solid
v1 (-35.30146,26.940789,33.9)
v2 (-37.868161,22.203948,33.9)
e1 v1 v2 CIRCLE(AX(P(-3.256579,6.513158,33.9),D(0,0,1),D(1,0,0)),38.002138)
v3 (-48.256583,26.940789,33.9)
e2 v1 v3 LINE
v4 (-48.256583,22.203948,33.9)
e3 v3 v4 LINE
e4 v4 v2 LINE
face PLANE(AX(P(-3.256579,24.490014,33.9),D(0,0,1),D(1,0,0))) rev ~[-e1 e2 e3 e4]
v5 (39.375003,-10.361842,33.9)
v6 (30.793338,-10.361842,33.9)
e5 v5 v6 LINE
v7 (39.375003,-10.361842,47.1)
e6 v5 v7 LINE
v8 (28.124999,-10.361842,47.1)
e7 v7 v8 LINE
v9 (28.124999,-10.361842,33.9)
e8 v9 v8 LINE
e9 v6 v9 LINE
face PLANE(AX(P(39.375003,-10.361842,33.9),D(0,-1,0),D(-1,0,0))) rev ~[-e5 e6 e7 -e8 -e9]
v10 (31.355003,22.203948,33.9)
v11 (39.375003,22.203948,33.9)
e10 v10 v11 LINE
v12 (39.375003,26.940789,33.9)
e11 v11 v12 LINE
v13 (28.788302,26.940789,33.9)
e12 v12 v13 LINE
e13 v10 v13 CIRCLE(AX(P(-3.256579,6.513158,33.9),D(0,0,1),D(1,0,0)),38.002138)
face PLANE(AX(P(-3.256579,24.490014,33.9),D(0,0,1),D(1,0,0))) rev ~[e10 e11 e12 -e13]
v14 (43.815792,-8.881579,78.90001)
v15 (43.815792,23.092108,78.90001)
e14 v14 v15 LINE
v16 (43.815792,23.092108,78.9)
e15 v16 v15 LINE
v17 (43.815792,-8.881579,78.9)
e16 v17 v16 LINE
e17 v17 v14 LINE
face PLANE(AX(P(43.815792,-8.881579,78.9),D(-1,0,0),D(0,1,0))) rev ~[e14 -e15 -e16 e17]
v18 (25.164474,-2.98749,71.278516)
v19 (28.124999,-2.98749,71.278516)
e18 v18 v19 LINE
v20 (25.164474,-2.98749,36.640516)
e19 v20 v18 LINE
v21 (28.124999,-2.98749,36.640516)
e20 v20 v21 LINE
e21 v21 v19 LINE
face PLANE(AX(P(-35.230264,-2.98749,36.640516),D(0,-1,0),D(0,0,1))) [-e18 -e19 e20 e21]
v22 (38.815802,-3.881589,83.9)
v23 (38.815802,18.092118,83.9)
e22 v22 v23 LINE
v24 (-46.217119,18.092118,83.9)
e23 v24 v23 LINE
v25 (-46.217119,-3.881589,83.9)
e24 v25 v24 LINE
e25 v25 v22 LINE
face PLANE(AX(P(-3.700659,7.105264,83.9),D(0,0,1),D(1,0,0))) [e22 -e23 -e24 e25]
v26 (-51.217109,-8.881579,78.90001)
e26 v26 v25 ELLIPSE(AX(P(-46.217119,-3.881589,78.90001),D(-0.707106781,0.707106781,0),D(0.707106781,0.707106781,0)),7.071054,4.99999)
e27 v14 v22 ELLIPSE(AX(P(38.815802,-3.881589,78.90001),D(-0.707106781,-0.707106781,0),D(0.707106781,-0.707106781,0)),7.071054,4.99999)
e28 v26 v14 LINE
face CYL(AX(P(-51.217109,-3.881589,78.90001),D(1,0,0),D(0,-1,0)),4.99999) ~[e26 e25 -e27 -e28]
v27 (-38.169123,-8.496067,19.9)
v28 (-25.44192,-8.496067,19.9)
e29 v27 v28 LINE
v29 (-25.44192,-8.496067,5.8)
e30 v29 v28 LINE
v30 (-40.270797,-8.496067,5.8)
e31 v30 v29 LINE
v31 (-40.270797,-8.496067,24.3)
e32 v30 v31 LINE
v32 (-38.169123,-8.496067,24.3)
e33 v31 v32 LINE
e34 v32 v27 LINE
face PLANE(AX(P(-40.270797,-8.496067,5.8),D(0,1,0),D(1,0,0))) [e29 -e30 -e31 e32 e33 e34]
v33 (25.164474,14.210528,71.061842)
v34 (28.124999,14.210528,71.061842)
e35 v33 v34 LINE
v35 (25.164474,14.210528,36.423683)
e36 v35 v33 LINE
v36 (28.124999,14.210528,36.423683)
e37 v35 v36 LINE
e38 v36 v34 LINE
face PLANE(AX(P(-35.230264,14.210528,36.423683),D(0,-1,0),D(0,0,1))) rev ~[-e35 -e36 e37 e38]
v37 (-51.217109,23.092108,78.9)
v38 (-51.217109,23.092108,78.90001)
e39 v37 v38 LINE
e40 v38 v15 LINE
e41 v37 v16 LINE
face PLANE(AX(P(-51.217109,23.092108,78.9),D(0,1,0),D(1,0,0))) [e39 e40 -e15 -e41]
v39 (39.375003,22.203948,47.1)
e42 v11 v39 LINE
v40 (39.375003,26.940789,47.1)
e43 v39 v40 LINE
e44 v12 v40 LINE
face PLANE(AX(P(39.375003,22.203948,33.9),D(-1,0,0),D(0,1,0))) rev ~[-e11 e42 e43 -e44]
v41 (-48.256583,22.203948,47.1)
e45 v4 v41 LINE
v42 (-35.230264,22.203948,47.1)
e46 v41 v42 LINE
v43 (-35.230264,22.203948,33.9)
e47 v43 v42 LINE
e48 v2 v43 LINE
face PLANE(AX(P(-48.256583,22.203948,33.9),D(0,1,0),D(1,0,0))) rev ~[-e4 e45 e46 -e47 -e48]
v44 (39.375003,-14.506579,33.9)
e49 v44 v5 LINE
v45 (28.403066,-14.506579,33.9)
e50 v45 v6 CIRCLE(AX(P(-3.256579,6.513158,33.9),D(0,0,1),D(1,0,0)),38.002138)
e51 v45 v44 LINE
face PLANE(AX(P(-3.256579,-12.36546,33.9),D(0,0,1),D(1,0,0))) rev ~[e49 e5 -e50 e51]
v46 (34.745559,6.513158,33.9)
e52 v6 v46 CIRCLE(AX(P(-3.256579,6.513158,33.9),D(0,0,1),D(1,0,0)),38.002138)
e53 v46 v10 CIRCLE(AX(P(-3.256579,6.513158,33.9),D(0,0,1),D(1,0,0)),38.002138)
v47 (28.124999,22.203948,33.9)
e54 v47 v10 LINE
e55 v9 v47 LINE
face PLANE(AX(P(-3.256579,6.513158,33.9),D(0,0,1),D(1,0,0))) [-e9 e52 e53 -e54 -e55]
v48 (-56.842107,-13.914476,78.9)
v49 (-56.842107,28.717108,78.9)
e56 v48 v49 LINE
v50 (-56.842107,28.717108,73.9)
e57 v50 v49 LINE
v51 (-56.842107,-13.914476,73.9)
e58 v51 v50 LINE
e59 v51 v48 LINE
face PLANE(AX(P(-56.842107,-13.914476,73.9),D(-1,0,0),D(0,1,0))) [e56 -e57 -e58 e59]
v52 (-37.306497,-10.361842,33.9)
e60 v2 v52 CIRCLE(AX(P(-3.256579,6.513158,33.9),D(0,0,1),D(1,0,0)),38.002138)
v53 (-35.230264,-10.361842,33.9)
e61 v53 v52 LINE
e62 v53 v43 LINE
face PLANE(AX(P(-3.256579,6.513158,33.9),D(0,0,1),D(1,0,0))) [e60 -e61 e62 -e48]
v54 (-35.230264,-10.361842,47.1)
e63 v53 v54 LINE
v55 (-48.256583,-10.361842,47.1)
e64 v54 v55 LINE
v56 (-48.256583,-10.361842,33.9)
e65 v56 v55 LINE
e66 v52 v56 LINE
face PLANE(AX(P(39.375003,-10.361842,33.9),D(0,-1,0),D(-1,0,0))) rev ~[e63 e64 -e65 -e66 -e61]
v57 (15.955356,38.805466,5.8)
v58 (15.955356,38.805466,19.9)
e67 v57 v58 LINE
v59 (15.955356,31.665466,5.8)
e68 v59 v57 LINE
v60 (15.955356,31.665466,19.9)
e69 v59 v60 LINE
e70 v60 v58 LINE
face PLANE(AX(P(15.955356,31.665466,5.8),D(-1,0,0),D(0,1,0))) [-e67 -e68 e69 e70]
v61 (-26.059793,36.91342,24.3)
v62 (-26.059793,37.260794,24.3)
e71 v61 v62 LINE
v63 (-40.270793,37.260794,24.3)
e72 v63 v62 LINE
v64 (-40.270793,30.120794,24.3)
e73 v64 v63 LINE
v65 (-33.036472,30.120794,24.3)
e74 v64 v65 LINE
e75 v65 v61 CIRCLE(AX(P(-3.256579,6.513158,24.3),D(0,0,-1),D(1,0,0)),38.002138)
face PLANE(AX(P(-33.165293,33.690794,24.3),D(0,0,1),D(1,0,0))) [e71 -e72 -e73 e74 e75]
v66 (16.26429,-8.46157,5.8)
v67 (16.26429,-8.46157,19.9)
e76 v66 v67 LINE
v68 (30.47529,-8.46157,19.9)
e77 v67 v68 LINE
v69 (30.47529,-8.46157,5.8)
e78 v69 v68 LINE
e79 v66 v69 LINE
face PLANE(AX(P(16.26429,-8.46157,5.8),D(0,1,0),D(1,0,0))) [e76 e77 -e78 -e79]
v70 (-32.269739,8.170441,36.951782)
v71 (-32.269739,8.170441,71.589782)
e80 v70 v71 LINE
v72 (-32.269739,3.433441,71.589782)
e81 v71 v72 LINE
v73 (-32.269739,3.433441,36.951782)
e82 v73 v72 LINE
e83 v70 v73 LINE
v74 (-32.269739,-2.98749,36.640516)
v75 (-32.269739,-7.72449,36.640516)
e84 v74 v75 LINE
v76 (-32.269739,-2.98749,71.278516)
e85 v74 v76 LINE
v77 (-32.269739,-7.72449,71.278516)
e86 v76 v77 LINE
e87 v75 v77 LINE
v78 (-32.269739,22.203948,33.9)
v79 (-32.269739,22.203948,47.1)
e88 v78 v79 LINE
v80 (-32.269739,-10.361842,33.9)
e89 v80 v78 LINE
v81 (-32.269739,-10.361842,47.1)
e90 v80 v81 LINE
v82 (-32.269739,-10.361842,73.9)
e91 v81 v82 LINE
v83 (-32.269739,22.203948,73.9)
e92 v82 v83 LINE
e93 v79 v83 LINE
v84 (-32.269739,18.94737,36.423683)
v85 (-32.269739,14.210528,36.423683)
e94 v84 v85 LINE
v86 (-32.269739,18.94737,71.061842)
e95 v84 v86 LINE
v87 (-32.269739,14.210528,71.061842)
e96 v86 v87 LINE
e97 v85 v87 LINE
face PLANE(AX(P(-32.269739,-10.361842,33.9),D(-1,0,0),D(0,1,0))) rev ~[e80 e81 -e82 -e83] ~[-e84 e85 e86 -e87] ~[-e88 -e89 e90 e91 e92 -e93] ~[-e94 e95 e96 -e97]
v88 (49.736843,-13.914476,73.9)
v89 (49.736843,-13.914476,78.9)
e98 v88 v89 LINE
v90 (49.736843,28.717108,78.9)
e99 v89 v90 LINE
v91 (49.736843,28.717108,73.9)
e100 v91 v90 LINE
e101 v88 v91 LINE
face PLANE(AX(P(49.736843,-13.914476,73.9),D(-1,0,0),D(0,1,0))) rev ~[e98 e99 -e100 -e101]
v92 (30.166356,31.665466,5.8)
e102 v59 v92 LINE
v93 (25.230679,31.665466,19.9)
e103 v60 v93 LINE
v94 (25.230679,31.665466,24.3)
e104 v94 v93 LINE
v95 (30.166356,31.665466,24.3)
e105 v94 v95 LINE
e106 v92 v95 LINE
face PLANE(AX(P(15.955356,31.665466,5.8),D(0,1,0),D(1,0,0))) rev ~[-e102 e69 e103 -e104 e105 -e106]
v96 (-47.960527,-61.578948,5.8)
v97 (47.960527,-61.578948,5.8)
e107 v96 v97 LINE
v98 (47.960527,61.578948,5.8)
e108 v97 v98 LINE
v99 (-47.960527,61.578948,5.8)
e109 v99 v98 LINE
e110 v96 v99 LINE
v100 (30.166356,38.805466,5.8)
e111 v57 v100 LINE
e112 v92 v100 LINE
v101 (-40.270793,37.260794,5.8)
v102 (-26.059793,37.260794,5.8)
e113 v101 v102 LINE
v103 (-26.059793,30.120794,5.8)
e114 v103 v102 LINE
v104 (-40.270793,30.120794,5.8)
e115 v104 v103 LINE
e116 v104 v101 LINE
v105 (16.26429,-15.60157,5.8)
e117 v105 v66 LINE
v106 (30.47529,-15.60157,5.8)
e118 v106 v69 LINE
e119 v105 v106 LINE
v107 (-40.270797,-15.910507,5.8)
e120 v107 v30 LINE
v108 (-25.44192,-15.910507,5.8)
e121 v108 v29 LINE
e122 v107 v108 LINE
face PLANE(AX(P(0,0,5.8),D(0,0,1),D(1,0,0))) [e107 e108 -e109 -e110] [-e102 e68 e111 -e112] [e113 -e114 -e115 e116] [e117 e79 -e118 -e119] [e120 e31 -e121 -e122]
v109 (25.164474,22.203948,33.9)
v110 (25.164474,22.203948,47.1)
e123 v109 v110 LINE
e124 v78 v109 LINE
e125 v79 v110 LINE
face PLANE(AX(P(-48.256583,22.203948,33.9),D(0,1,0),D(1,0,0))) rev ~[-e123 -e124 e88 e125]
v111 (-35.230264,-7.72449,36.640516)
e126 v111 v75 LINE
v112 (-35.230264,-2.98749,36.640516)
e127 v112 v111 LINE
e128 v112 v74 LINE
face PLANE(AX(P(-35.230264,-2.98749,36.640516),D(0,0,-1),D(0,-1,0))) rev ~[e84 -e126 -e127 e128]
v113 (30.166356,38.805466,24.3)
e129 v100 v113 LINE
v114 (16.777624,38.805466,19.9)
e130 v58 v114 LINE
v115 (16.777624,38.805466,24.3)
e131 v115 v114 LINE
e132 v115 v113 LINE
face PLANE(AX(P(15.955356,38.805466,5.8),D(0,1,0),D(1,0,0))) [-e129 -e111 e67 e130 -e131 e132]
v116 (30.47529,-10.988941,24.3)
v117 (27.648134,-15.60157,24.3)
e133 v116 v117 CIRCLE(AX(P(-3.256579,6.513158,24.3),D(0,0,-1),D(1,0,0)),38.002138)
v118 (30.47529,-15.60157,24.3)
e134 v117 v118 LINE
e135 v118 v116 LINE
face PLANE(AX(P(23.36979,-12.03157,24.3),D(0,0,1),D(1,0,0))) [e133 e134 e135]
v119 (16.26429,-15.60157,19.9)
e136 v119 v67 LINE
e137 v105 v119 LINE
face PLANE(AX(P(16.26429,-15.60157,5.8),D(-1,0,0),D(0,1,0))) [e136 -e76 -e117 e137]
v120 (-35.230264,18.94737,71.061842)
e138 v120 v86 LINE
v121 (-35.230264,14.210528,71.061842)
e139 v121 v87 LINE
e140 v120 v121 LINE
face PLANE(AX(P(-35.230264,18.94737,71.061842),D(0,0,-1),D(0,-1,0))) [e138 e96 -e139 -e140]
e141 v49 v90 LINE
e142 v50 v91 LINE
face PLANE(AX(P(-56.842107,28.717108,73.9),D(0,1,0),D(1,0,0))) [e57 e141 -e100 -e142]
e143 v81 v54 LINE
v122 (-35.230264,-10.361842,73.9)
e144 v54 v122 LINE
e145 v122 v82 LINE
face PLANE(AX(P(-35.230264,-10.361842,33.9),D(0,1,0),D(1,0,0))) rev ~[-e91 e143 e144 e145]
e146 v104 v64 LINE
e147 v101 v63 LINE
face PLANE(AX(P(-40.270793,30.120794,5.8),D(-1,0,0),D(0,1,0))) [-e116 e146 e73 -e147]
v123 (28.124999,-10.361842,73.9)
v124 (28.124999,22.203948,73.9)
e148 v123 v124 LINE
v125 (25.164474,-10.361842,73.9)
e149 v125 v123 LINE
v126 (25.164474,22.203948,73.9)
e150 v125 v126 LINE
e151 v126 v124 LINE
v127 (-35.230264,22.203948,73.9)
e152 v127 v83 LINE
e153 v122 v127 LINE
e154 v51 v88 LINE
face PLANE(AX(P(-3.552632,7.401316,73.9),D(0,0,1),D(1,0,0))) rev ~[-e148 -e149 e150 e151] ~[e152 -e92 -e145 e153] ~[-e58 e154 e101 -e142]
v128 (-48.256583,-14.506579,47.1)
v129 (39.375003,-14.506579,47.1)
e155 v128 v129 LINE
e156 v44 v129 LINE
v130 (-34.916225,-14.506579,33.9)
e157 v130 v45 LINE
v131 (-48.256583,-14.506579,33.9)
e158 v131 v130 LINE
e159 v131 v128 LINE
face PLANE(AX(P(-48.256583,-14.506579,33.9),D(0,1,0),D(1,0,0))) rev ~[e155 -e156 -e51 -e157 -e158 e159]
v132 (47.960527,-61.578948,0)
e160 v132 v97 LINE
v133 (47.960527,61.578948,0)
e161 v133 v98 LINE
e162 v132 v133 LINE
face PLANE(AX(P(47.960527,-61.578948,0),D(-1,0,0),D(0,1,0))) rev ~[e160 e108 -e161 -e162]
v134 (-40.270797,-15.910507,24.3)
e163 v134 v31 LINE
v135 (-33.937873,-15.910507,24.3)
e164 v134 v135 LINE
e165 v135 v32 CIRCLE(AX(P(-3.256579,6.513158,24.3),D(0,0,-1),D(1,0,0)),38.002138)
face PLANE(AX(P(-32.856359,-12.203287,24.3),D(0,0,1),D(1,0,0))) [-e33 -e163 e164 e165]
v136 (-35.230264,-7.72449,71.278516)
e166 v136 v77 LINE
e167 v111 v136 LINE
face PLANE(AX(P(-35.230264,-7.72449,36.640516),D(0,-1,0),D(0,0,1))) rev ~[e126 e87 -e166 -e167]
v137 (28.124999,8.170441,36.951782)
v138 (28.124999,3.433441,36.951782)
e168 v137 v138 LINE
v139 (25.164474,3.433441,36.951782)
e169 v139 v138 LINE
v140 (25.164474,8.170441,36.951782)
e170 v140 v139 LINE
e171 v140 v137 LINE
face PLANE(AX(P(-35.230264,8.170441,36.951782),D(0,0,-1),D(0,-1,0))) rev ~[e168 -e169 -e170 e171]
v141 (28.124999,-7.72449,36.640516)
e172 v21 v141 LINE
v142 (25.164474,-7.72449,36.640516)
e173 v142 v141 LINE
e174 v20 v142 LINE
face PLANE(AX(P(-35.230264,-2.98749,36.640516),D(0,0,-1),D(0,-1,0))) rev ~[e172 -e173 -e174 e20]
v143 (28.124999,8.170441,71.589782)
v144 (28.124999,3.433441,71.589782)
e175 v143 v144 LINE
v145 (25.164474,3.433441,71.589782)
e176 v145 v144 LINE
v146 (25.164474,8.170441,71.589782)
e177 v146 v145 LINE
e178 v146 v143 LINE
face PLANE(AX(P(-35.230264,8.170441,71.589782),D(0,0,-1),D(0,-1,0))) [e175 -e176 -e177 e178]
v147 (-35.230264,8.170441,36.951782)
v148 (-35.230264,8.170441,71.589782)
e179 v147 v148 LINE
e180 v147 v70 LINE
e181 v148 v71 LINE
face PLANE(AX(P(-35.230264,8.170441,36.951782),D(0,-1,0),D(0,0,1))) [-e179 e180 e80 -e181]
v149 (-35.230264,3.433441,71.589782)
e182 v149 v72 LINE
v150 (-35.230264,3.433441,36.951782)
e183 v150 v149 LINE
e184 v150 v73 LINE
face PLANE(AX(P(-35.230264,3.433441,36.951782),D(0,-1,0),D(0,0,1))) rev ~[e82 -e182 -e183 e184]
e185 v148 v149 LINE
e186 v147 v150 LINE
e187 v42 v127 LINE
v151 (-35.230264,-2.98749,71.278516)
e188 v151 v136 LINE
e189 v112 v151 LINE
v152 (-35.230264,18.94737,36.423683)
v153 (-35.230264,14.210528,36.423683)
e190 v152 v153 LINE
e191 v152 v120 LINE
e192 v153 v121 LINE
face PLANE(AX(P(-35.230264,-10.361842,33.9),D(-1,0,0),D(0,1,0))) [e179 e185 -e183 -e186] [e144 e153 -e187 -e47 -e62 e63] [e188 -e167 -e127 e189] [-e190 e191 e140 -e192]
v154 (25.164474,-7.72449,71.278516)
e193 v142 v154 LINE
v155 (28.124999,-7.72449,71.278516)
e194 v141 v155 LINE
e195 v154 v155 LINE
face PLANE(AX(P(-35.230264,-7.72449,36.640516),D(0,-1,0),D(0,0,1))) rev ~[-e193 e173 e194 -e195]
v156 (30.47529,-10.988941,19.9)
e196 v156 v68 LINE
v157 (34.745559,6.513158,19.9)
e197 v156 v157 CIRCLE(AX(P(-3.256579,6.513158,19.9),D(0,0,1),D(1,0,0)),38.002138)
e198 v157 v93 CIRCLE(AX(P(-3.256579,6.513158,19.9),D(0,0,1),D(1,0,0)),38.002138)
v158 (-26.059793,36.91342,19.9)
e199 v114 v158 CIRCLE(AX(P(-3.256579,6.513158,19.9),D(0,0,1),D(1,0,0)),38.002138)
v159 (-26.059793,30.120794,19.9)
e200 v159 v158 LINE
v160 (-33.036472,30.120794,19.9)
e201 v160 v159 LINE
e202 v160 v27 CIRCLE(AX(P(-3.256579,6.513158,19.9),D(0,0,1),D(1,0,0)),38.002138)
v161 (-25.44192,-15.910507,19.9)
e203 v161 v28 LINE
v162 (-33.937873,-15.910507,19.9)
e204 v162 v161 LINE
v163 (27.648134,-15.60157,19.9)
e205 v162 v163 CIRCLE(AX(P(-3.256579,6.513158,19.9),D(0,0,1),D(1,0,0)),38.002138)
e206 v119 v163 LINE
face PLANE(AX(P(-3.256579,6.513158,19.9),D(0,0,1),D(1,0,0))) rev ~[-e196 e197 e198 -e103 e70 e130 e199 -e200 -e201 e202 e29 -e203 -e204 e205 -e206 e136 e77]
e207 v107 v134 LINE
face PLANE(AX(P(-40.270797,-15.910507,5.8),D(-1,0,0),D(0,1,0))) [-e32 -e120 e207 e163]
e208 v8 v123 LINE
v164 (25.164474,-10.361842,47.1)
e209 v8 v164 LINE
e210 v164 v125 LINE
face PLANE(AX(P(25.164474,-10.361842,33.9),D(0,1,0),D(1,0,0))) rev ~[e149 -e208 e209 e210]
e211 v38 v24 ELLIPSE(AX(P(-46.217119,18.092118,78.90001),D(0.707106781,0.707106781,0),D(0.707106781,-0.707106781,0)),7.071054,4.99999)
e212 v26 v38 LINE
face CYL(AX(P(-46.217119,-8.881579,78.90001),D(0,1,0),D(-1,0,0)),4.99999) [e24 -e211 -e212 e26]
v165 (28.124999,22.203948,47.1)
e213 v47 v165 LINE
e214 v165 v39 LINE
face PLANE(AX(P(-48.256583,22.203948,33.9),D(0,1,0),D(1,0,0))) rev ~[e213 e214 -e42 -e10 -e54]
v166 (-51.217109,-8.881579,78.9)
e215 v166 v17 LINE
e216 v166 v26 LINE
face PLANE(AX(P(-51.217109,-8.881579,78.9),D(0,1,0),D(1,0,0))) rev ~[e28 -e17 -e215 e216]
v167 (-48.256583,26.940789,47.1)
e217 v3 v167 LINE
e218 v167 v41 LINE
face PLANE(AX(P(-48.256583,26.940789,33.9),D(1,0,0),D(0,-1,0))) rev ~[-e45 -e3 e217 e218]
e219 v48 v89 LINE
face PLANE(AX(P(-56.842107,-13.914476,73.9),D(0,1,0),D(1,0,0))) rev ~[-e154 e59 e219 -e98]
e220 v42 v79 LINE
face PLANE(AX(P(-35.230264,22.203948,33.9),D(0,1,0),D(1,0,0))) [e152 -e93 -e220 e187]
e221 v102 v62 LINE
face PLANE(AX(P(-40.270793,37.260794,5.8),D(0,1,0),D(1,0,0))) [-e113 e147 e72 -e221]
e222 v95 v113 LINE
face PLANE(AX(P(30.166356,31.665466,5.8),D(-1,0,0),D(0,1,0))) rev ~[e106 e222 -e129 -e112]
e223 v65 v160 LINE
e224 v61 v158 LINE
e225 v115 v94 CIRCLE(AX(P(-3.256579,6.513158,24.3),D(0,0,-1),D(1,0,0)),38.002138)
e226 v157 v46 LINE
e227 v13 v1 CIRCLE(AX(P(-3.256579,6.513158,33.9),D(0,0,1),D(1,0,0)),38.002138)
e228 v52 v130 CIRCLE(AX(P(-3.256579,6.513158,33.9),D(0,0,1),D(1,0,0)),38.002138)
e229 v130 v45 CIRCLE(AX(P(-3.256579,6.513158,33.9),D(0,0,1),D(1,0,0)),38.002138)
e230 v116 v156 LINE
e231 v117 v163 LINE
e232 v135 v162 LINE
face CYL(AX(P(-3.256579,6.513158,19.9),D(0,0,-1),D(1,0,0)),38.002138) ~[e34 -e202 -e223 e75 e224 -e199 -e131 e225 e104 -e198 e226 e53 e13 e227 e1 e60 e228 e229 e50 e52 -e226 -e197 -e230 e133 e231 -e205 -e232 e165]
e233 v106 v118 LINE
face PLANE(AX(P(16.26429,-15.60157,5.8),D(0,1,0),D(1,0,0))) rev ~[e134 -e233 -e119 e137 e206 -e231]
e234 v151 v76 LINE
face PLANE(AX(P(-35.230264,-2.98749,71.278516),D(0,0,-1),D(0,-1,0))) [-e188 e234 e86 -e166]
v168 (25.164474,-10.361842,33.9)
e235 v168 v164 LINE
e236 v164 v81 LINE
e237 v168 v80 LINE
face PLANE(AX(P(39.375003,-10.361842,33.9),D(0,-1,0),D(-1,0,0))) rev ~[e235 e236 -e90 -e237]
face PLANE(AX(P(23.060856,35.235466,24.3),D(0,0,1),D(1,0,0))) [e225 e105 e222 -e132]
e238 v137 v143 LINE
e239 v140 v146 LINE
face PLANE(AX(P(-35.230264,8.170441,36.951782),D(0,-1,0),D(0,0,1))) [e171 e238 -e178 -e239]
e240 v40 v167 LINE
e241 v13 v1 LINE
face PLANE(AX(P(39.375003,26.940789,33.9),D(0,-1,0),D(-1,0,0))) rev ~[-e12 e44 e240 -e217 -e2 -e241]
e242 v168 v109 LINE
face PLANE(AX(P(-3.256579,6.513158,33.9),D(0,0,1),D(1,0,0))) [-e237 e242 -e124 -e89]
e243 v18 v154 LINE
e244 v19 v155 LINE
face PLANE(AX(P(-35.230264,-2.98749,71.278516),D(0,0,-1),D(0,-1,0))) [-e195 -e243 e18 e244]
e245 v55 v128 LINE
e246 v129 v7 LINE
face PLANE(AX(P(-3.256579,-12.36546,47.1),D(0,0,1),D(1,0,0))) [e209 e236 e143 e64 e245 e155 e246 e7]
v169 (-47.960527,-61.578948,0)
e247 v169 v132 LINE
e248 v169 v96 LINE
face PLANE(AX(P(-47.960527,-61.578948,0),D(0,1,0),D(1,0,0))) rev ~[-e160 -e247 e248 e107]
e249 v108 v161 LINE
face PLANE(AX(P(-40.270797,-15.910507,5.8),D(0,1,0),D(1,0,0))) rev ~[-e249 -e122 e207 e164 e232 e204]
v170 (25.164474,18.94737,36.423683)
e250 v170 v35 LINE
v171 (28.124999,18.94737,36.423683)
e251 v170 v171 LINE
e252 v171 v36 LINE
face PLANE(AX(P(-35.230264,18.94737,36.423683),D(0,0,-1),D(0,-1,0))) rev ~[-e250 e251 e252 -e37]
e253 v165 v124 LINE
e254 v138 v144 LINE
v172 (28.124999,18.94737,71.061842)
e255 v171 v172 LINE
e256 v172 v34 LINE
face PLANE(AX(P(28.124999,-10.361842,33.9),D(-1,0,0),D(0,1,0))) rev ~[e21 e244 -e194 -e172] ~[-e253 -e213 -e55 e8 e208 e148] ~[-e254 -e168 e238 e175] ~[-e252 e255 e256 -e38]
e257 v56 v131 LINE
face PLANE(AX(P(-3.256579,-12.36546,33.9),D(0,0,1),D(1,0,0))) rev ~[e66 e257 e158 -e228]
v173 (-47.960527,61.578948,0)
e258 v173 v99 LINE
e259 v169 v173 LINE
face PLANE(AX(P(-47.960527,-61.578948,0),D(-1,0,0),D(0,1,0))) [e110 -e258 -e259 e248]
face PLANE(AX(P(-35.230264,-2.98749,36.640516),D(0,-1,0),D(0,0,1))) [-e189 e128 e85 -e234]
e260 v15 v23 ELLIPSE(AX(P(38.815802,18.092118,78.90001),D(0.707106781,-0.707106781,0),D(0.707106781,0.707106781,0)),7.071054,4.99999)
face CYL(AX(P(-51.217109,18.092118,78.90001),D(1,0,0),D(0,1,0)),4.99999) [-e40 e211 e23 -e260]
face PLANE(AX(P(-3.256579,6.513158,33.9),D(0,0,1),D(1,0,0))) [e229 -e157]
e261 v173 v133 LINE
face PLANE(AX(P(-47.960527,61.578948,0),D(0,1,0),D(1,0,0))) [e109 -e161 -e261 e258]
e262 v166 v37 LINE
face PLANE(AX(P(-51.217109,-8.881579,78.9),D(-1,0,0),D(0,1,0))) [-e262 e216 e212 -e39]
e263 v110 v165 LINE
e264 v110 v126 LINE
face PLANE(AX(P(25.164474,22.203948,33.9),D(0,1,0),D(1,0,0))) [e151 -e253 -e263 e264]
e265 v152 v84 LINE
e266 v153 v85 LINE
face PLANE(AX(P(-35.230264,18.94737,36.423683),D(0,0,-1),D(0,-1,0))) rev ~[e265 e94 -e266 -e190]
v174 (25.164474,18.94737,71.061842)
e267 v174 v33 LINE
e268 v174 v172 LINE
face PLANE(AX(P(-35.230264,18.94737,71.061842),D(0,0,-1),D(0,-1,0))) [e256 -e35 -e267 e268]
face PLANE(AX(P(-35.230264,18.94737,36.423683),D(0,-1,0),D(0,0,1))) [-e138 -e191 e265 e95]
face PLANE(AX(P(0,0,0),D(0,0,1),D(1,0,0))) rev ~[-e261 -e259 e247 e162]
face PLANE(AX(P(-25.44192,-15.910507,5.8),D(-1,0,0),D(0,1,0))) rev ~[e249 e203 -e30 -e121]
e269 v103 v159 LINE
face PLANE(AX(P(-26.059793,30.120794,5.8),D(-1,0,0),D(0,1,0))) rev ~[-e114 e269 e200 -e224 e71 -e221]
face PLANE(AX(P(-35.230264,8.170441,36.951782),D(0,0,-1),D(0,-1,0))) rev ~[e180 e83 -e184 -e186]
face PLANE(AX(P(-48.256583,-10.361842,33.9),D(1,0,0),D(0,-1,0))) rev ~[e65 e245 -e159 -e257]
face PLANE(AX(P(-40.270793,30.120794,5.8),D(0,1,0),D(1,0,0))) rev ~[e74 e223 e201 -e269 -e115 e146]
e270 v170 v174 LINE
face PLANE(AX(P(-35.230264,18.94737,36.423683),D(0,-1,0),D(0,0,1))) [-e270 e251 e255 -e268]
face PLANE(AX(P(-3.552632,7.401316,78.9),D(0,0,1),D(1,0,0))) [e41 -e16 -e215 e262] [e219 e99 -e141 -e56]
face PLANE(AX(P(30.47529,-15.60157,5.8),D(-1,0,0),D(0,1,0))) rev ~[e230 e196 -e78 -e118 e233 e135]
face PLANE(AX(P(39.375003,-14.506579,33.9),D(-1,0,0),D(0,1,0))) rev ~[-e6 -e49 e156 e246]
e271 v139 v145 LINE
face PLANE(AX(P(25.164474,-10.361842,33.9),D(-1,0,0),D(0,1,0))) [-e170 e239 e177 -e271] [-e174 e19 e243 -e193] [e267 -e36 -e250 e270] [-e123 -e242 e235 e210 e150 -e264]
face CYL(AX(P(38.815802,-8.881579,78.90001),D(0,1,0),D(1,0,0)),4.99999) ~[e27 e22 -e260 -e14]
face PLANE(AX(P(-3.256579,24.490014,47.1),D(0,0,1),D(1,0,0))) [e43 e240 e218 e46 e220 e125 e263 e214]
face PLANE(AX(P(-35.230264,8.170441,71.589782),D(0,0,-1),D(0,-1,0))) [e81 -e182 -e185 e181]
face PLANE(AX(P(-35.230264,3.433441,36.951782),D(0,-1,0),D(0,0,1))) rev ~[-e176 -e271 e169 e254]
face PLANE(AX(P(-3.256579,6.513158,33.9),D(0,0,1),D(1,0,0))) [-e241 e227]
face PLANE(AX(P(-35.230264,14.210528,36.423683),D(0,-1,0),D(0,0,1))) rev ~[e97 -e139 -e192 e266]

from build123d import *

# Parameters (mm, degrees)
F0_W      = 95.9210544825
F0_H      = 123.1578961015
F1_DEPTH  = 5.8
F2_W      = 14.211
F2_H      = 7.14
F2_W_2    = 14.82887734
F2_H_2    = 7.4144396418
F3_DEPTH  = 18.5
F5_R      = 38.0021383108
F6_DEPTH  = 14
F8_DEPTH  = 13.2
F9_W      = 2.9605254531
F9_H      = 32.5657902285
F10_DEPTH = 40
F12_W     = 106.5789507702
F12_H     = 42.6315842196
F13_DEPTH = 5
F15_W     = 95.0329005718
F15_H     = 31.9736870006
F16_DEPTH = 5
F17_R     = 4.99999
F18_W     = 4.7368425876
F18_H     = 34.638158977
F19_DEPTH = 69.8
F20_W     = 4.737
F20_H     = 34.638
F21_DEPTH = 93.3
F22_W     = 4.737
F22_H     = 34.638
F23_DEPTH = 98.3


# Not quite as in the source:
# - a fillet or chamfer is up to 0.001 mm smaller than in the source, because OpenCascade refuses the exact size


with BuildPart() as f1:
    # F0 (on Top) → F1 (new body)
    with BuildSketch(Plane.XY):
        Rectangle(F0_W, F0_H)
    extrude(amount=F1_DEPTH)

    # F2 (on face) → F3 (join)
    with BuildSketch(Plane.XY.offset(5.8)):
        with Locations((-33.1652933639, 33.6907944659)):
            Rectangle(F2_W, F2_H)
        with Locations((23.060855536, 35.2354664353)):
            Rectangle(F2_W, F2_H)
        with Locations((23.3697903186, -12.0315703675)):
            Rectangle(F2_W, F2_H)
        with Locations((-32.8563585813, -12.2032872729)):
            Rectangle(F2_W_2, F2_H_2)
    extrude(amount=F3_DEPTH)

    # F5 (on offset) → F6 (join)
    with BuildSketch(Plane.XY.offset(19.9)):
        with Locations((-3.2565793954, 6.5131578594)):
            Circle(F5_R)
    extrude(amount=F6_DEPTH)

    # F7 (on face) → F8 (join)
    with BuildSketch(Plane.XY.offset(33.9)):
        with BuildLine():
            Line((30.7933383724, -10.3618418798), (-37.3064971632, -10.3618418798))
            ThreePointArc((-37.3064971632, -10.3618418798), (-36.1766552365, -12.4718657857), (-34.9162250459, -14.5065793768))
            Line((-34.9162250459, -14.5065793768), (28.4030662551, -14.5065793768))
            ThreePointArc((28.4030662551, -14.5065793768), (29.6634964457, -12.4718657857), (30.7933383724, -10.3618418798))
        make_face()
        with BuildLine():
            Line((39.3750034273, -10.3618418798), (30.7933383724, -10.3618418798))
            ThreePointArc((30.7933383724, -10.3618418798), (29.6634964457, -12.4718657857), (28.4030662551, -14.5065793768))
            Line((28.4030662551, -14.5065793768), (39.3750034273, -14.5065793768))
            Line((39.3750034273, -14.5065793768), (39.3750034273, -10.3618418798))
        make_face()
        with BuildLine():
            ThreePointArc((-34.9162250459, -14.5065793768), (-36.1766552365, -12.4718657857), (-37.3064971632, -10.3618418798))
            Line((-37.3064971632, -10.3618418798), (-48.2565825805, -10.3618418798))
            Line((-48.2565825805, -10.3618418798), (-48.2565825805, -14.5065793768))
            Line((-48.2565825805, -14.5065793768), (-34.9162250459, -14.5065793768))
        make_face()
        with BuildLine():
            Line((-37.8681614166, 22.2039483488), (31.3550026259, 22.2039483488))
            ThreePointArc((31.3550026259, 22.2039483488), (30.1557002498, 24.6179109675), (28.7883016181, 26.9407890737))
            Line((28.7883016181, 26.9407890737), (-35.3014604088, 26.9407890737))
            ThreePointArc((-35.3014604088, 26.9407890737), (-36.6688590406, 24.6179109675), (-37.8681614166, 22.2039483488))
        make_face()
        with BuildLine():
            Line((-48.2565825805, 22.2039483488), (-37.8681614166, 22.2039483488))
            ThreePointArc((-37.8681614166, 22.2039483488), (-36.6688590406, 24.6179109675), (-35.3014604088, 26.9407890737))
            Line((-35.3014604088, 26.9407890737), (-48.2565825805, 26.9407890737))
            Line((-48.2565825805, 26.9407890737), (-48.2565825805, 22.2039483488))
        make_face()
        with BuildLine():
            Line((31.3550026259, 22.2039483488), (39.3750034273, 22.2039483488))
            Line((39.3750034273, 22.2039483488), (39.3750034273, 26.9407890737))
            Line((39.3750034273, 26.9407890737), (28.7883016181, 26.9407890737))
            ThreePointArc((28.7883016181, 26.9407890737), (30.1557002498, 24.6179109675), (31.3550026259, 22.2039483488))
        make_face()
    extrude(amount=F8_DEPTH)

    # F9 (on face) → F10 (join)
    with BuildSketch(Plane.XY.offset(33.9)):
        with Locations((-33.7500013411, 5.9210532345)):
            Rectangle(F9_W, F9_H)
        with Locations((26.6447365284, 5.9210532345)):
            Rectangle(F9_W, F9_H)
    extrude(amount=F10_DEPTH)

    # F12 (on offset) → F13 (join)
    with BuildSketch(Plane.XY.offset(73.9)):
        with Locations((-3.5526319407, 7.401315961)):
            Rectangle(F12_W, F12_H)
    extrude(amount=F13_DEPTH)

    # F15 (on face) → F16 (join)
    with BuildSketch(Plane.XY.offset(78.9)):
        with Locations((-3.700658679, 7.105264347)):
            Rectangle(F15_W, F15_H)
    extrude(amount=F16_DEPTH)

    # F17 (radius 5 in the source; OpenCascade refuses exactly that, so slightly less here)
    f17_edges = [f1.edges().sort_by_distance(p)[0] for p in [
        (-3.700659, 23.092108, 83.9),
        (-51.217109, 7.105264, 83.9),
        (-3.700659, -8.881579, 83.9),
        (43.815792, 7.105264, 83.9),
    ]]
    fillet(f17_edges, radius=F17_R)

    # F18 (on face) → F19 (cut)
    with BuildSketch(Plane(origin=(-35.2302640676, 0, 0), x_dir=(0, -1, 0), z_dir=(-1, 0, 0))):
        with Locations((-16.5789490566, 53.742762655)):
            Rectangle(F18_W, F18_H)
    extrude(amount=-F19_DEPTH, mode=Mode.SUBTRACT)

    # F20 (on face) → F21 (cut)
    with BuildSketch(Plane(origin=(-35.2302640676, 0, 0), x_dir=(0, -1, 0), z_dir=(-1, 0, 0))):
        with Locations((-5.8019411517, 54.2707815458)):
            Rectangle(F20_W, F20_H)
    extrude(amount=-F21_DEPTH, mode=Mode.SUBTRACT)

    # F22 (on face) → F23 (cut)
    with BuildSketch(Plane(origin=(-35.2302640676, 0, 0), x_dir=(0, -1, 0), z_dir=(-1, 0, 0))):
        with Locations((5.355990259, 53.9595156418)):
            Rectangle(F22_W, F22_H)
    extrude(amount=-F23_DEPTH, mode=Mode.SUBTRACT)


solid = f1.part
